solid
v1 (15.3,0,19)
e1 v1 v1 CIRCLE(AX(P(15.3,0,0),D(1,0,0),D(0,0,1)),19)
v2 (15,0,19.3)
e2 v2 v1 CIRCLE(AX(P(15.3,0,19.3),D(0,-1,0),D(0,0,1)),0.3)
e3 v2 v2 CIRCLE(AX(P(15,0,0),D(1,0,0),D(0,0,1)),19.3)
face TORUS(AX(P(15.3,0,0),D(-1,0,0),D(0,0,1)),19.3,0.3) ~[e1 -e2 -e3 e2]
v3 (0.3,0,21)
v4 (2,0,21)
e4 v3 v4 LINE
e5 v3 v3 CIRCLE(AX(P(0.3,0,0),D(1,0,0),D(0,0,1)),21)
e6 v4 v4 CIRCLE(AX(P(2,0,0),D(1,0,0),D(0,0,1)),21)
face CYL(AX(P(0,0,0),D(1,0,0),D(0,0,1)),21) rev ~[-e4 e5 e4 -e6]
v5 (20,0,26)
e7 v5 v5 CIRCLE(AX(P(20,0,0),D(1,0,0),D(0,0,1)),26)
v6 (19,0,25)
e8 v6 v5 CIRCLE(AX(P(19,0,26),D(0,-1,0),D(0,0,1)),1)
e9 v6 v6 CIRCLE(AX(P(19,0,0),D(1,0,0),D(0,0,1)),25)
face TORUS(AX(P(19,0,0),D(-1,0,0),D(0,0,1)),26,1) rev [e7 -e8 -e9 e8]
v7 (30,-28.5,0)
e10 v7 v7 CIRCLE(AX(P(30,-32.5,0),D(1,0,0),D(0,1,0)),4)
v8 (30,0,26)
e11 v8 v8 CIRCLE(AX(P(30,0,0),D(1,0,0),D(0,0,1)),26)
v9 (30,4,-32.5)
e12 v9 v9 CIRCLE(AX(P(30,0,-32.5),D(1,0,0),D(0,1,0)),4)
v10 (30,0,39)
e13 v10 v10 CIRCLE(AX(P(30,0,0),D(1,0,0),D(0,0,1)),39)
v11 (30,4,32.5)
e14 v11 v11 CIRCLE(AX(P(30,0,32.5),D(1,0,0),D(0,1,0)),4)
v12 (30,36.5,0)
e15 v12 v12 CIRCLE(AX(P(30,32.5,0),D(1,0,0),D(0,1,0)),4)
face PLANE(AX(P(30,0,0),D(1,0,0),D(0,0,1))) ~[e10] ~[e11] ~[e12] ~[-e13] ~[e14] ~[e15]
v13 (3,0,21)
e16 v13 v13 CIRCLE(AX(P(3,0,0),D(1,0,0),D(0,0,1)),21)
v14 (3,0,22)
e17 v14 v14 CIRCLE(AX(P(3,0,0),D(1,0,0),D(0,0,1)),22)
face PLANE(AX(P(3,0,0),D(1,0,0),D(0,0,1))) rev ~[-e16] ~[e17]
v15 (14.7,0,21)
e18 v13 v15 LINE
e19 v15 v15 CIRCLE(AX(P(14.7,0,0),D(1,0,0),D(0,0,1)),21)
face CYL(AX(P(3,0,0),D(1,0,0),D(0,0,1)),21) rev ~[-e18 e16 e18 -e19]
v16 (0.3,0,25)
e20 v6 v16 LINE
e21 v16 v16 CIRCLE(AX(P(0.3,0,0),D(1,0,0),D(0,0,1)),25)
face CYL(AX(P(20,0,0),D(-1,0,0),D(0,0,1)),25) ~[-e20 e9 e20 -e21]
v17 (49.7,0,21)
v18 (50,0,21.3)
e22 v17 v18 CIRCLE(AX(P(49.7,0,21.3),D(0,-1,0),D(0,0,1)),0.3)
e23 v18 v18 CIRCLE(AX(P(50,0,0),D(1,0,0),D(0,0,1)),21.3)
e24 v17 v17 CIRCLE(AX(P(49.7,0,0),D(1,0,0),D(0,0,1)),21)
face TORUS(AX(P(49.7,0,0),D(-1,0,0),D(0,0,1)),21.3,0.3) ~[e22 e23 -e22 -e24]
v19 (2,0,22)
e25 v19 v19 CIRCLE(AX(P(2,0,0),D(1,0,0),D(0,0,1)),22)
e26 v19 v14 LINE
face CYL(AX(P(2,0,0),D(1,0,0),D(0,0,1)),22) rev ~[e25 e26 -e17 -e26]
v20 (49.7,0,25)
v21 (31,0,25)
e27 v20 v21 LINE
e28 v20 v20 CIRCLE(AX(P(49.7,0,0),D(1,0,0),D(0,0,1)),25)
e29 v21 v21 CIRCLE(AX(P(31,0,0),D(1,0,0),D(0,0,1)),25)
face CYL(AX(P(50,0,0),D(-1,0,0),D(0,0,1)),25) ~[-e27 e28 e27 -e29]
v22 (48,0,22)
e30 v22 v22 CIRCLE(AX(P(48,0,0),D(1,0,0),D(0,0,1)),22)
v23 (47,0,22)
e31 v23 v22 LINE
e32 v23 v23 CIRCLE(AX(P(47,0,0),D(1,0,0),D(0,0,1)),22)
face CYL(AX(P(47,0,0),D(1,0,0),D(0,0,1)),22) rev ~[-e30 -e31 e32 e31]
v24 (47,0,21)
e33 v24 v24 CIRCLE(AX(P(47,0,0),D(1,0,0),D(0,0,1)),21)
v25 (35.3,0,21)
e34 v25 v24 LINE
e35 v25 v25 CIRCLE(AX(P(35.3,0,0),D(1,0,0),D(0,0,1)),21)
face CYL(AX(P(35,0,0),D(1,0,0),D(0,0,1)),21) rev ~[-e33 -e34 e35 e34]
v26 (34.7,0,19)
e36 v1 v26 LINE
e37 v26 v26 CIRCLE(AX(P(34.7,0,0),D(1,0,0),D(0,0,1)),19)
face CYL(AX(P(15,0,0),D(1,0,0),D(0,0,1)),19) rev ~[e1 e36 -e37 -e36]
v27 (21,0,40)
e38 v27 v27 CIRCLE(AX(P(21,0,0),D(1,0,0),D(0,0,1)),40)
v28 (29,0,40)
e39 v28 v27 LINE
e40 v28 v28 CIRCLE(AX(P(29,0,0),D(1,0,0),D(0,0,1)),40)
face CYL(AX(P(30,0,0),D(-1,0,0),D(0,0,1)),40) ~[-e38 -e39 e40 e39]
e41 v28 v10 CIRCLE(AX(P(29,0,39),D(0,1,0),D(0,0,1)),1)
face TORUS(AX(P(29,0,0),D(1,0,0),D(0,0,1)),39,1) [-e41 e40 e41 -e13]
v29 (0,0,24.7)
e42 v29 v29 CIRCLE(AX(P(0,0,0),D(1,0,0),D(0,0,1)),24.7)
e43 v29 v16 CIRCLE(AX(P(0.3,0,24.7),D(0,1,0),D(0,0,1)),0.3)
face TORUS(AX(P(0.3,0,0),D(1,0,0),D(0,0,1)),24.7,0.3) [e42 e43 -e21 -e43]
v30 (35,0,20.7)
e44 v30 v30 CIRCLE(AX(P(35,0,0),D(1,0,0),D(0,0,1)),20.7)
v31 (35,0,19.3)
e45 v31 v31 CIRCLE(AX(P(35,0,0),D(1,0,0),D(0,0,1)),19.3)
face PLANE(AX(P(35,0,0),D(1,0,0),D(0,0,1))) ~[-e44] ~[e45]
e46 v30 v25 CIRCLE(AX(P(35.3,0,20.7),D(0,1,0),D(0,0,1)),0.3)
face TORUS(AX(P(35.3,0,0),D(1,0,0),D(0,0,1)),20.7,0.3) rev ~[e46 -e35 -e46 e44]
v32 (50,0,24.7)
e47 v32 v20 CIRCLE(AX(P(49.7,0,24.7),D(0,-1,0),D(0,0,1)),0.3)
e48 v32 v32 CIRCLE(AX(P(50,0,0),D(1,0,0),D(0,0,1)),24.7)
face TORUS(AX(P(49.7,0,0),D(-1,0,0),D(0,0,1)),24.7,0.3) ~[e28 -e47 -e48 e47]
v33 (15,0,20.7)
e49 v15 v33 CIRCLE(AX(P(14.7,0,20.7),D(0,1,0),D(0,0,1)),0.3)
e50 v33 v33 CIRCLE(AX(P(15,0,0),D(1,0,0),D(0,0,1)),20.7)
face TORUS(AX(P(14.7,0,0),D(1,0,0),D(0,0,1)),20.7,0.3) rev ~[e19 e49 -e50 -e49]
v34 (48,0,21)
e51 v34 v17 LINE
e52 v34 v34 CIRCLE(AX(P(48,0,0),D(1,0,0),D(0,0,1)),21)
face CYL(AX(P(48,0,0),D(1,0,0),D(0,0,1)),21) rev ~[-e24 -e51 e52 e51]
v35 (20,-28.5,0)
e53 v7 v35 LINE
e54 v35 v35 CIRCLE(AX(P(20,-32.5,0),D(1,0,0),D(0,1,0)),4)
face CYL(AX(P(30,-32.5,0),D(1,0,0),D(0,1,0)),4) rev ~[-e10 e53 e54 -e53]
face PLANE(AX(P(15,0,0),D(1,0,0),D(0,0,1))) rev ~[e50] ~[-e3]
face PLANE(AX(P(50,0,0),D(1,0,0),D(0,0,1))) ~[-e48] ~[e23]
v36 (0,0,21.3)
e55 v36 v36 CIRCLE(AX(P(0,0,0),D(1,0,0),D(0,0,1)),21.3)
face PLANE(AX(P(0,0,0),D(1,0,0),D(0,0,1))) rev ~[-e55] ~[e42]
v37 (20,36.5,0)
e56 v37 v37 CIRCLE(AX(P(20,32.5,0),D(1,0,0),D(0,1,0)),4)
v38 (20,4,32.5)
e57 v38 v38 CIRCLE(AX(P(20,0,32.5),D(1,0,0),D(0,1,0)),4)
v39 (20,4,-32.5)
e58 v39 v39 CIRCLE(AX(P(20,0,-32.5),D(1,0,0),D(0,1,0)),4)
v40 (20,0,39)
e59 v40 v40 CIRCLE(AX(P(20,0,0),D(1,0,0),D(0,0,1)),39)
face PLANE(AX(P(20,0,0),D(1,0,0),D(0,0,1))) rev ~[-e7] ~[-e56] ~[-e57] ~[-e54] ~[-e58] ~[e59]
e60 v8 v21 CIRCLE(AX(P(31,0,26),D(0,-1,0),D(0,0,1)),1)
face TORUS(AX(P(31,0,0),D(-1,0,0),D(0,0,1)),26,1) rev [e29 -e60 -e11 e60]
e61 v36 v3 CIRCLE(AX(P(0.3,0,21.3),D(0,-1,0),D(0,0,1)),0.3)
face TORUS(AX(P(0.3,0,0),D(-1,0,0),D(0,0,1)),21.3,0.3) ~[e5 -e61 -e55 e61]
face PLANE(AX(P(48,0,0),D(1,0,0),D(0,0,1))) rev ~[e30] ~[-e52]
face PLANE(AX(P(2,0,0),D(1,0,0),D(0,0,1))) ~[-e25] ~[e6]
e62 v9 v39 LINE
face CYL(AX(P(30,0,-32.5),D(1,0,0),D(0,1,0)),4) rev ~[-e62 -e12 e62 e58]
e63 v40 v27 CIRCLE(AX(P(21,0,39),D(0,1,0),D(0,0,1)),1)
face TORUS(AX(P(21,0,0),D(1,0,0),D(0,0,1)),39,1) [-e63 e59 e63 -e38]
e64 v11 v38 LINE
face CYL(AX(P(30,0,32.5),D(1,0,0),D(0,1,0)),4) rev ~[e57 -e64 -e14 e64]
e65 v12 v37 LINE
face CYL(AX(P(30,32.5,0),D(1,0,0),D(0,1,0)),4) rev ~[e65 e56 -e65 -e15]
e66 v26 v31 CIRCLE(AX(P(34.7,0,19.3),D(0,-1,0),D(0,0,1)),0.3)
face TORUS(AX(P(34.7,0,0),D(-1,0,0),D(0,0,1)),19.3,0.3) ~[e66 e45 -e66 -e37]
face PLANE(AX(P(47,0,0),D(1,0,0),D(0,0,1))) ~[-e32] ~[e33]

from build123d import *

# Parameters (mm, degrees)
F2_R     = 0.3
F3_R     = 1
F4_R     = 4
F5_DEPTH = 30.001


with BuildPart() as f1:
    # F0 (on Front) → F1 (revolve)
    with BuildSketch(Plane.XZ):
        Polygon((0, 25), (0, 21), (2, 21), (2, 22), (3, 22), (3, 21), (15, 21), (15, 19), (35, 19), (35, 21), (47, 21), (47, 22), (48, 22), (48, 21), (50, 21), (50, 25), (30, 25), (30, 40), (20, 40), (20, 25), align=None)
    revolve(axis=Axis((26.2251488414, 0, 0), (1, 0, 0)))

    # F2
    f2_edges = [f1.edges().sort_by_distance(p)[0] for p in [
        (15, 0, -21),
        (0, 0, -21),
        (15, 0, -19),
        (35, 0, -21),
        (0, 0, -25),
        (35, 0, -19),
        (50, 0, -21),
        (50, 0, -25),
    ]]
    fillet(f2_edges, radius=F2_R)

    # F3
    f3_edges = [f1.edges().sort_by_distance(p)[0] for p in [
        (30, 0, -25),
        (20, 0, -40),
        (20, 0, -25),
        (30, 0, -40),
    ]]
    fillet(f3_edges, radius=F3_R)

    # F4 (on face) → F5 (cut, through all)
    with BuildSketch(Plane.YZ.offset(30)):
        with Locations((0, 32.5)):
            Circle(F4_R)
        with Locations((-32.5, 0)):
            Circle(F4_R)
        with Locations((0, -32.5)):
            Circle(F4_R)
        with Locations((32.5, 0)):
            Circle(F4_R)
    extrude(amount=-F5_DEPTH, mode=Mode.SUBTRACT)


solid = f1.part
